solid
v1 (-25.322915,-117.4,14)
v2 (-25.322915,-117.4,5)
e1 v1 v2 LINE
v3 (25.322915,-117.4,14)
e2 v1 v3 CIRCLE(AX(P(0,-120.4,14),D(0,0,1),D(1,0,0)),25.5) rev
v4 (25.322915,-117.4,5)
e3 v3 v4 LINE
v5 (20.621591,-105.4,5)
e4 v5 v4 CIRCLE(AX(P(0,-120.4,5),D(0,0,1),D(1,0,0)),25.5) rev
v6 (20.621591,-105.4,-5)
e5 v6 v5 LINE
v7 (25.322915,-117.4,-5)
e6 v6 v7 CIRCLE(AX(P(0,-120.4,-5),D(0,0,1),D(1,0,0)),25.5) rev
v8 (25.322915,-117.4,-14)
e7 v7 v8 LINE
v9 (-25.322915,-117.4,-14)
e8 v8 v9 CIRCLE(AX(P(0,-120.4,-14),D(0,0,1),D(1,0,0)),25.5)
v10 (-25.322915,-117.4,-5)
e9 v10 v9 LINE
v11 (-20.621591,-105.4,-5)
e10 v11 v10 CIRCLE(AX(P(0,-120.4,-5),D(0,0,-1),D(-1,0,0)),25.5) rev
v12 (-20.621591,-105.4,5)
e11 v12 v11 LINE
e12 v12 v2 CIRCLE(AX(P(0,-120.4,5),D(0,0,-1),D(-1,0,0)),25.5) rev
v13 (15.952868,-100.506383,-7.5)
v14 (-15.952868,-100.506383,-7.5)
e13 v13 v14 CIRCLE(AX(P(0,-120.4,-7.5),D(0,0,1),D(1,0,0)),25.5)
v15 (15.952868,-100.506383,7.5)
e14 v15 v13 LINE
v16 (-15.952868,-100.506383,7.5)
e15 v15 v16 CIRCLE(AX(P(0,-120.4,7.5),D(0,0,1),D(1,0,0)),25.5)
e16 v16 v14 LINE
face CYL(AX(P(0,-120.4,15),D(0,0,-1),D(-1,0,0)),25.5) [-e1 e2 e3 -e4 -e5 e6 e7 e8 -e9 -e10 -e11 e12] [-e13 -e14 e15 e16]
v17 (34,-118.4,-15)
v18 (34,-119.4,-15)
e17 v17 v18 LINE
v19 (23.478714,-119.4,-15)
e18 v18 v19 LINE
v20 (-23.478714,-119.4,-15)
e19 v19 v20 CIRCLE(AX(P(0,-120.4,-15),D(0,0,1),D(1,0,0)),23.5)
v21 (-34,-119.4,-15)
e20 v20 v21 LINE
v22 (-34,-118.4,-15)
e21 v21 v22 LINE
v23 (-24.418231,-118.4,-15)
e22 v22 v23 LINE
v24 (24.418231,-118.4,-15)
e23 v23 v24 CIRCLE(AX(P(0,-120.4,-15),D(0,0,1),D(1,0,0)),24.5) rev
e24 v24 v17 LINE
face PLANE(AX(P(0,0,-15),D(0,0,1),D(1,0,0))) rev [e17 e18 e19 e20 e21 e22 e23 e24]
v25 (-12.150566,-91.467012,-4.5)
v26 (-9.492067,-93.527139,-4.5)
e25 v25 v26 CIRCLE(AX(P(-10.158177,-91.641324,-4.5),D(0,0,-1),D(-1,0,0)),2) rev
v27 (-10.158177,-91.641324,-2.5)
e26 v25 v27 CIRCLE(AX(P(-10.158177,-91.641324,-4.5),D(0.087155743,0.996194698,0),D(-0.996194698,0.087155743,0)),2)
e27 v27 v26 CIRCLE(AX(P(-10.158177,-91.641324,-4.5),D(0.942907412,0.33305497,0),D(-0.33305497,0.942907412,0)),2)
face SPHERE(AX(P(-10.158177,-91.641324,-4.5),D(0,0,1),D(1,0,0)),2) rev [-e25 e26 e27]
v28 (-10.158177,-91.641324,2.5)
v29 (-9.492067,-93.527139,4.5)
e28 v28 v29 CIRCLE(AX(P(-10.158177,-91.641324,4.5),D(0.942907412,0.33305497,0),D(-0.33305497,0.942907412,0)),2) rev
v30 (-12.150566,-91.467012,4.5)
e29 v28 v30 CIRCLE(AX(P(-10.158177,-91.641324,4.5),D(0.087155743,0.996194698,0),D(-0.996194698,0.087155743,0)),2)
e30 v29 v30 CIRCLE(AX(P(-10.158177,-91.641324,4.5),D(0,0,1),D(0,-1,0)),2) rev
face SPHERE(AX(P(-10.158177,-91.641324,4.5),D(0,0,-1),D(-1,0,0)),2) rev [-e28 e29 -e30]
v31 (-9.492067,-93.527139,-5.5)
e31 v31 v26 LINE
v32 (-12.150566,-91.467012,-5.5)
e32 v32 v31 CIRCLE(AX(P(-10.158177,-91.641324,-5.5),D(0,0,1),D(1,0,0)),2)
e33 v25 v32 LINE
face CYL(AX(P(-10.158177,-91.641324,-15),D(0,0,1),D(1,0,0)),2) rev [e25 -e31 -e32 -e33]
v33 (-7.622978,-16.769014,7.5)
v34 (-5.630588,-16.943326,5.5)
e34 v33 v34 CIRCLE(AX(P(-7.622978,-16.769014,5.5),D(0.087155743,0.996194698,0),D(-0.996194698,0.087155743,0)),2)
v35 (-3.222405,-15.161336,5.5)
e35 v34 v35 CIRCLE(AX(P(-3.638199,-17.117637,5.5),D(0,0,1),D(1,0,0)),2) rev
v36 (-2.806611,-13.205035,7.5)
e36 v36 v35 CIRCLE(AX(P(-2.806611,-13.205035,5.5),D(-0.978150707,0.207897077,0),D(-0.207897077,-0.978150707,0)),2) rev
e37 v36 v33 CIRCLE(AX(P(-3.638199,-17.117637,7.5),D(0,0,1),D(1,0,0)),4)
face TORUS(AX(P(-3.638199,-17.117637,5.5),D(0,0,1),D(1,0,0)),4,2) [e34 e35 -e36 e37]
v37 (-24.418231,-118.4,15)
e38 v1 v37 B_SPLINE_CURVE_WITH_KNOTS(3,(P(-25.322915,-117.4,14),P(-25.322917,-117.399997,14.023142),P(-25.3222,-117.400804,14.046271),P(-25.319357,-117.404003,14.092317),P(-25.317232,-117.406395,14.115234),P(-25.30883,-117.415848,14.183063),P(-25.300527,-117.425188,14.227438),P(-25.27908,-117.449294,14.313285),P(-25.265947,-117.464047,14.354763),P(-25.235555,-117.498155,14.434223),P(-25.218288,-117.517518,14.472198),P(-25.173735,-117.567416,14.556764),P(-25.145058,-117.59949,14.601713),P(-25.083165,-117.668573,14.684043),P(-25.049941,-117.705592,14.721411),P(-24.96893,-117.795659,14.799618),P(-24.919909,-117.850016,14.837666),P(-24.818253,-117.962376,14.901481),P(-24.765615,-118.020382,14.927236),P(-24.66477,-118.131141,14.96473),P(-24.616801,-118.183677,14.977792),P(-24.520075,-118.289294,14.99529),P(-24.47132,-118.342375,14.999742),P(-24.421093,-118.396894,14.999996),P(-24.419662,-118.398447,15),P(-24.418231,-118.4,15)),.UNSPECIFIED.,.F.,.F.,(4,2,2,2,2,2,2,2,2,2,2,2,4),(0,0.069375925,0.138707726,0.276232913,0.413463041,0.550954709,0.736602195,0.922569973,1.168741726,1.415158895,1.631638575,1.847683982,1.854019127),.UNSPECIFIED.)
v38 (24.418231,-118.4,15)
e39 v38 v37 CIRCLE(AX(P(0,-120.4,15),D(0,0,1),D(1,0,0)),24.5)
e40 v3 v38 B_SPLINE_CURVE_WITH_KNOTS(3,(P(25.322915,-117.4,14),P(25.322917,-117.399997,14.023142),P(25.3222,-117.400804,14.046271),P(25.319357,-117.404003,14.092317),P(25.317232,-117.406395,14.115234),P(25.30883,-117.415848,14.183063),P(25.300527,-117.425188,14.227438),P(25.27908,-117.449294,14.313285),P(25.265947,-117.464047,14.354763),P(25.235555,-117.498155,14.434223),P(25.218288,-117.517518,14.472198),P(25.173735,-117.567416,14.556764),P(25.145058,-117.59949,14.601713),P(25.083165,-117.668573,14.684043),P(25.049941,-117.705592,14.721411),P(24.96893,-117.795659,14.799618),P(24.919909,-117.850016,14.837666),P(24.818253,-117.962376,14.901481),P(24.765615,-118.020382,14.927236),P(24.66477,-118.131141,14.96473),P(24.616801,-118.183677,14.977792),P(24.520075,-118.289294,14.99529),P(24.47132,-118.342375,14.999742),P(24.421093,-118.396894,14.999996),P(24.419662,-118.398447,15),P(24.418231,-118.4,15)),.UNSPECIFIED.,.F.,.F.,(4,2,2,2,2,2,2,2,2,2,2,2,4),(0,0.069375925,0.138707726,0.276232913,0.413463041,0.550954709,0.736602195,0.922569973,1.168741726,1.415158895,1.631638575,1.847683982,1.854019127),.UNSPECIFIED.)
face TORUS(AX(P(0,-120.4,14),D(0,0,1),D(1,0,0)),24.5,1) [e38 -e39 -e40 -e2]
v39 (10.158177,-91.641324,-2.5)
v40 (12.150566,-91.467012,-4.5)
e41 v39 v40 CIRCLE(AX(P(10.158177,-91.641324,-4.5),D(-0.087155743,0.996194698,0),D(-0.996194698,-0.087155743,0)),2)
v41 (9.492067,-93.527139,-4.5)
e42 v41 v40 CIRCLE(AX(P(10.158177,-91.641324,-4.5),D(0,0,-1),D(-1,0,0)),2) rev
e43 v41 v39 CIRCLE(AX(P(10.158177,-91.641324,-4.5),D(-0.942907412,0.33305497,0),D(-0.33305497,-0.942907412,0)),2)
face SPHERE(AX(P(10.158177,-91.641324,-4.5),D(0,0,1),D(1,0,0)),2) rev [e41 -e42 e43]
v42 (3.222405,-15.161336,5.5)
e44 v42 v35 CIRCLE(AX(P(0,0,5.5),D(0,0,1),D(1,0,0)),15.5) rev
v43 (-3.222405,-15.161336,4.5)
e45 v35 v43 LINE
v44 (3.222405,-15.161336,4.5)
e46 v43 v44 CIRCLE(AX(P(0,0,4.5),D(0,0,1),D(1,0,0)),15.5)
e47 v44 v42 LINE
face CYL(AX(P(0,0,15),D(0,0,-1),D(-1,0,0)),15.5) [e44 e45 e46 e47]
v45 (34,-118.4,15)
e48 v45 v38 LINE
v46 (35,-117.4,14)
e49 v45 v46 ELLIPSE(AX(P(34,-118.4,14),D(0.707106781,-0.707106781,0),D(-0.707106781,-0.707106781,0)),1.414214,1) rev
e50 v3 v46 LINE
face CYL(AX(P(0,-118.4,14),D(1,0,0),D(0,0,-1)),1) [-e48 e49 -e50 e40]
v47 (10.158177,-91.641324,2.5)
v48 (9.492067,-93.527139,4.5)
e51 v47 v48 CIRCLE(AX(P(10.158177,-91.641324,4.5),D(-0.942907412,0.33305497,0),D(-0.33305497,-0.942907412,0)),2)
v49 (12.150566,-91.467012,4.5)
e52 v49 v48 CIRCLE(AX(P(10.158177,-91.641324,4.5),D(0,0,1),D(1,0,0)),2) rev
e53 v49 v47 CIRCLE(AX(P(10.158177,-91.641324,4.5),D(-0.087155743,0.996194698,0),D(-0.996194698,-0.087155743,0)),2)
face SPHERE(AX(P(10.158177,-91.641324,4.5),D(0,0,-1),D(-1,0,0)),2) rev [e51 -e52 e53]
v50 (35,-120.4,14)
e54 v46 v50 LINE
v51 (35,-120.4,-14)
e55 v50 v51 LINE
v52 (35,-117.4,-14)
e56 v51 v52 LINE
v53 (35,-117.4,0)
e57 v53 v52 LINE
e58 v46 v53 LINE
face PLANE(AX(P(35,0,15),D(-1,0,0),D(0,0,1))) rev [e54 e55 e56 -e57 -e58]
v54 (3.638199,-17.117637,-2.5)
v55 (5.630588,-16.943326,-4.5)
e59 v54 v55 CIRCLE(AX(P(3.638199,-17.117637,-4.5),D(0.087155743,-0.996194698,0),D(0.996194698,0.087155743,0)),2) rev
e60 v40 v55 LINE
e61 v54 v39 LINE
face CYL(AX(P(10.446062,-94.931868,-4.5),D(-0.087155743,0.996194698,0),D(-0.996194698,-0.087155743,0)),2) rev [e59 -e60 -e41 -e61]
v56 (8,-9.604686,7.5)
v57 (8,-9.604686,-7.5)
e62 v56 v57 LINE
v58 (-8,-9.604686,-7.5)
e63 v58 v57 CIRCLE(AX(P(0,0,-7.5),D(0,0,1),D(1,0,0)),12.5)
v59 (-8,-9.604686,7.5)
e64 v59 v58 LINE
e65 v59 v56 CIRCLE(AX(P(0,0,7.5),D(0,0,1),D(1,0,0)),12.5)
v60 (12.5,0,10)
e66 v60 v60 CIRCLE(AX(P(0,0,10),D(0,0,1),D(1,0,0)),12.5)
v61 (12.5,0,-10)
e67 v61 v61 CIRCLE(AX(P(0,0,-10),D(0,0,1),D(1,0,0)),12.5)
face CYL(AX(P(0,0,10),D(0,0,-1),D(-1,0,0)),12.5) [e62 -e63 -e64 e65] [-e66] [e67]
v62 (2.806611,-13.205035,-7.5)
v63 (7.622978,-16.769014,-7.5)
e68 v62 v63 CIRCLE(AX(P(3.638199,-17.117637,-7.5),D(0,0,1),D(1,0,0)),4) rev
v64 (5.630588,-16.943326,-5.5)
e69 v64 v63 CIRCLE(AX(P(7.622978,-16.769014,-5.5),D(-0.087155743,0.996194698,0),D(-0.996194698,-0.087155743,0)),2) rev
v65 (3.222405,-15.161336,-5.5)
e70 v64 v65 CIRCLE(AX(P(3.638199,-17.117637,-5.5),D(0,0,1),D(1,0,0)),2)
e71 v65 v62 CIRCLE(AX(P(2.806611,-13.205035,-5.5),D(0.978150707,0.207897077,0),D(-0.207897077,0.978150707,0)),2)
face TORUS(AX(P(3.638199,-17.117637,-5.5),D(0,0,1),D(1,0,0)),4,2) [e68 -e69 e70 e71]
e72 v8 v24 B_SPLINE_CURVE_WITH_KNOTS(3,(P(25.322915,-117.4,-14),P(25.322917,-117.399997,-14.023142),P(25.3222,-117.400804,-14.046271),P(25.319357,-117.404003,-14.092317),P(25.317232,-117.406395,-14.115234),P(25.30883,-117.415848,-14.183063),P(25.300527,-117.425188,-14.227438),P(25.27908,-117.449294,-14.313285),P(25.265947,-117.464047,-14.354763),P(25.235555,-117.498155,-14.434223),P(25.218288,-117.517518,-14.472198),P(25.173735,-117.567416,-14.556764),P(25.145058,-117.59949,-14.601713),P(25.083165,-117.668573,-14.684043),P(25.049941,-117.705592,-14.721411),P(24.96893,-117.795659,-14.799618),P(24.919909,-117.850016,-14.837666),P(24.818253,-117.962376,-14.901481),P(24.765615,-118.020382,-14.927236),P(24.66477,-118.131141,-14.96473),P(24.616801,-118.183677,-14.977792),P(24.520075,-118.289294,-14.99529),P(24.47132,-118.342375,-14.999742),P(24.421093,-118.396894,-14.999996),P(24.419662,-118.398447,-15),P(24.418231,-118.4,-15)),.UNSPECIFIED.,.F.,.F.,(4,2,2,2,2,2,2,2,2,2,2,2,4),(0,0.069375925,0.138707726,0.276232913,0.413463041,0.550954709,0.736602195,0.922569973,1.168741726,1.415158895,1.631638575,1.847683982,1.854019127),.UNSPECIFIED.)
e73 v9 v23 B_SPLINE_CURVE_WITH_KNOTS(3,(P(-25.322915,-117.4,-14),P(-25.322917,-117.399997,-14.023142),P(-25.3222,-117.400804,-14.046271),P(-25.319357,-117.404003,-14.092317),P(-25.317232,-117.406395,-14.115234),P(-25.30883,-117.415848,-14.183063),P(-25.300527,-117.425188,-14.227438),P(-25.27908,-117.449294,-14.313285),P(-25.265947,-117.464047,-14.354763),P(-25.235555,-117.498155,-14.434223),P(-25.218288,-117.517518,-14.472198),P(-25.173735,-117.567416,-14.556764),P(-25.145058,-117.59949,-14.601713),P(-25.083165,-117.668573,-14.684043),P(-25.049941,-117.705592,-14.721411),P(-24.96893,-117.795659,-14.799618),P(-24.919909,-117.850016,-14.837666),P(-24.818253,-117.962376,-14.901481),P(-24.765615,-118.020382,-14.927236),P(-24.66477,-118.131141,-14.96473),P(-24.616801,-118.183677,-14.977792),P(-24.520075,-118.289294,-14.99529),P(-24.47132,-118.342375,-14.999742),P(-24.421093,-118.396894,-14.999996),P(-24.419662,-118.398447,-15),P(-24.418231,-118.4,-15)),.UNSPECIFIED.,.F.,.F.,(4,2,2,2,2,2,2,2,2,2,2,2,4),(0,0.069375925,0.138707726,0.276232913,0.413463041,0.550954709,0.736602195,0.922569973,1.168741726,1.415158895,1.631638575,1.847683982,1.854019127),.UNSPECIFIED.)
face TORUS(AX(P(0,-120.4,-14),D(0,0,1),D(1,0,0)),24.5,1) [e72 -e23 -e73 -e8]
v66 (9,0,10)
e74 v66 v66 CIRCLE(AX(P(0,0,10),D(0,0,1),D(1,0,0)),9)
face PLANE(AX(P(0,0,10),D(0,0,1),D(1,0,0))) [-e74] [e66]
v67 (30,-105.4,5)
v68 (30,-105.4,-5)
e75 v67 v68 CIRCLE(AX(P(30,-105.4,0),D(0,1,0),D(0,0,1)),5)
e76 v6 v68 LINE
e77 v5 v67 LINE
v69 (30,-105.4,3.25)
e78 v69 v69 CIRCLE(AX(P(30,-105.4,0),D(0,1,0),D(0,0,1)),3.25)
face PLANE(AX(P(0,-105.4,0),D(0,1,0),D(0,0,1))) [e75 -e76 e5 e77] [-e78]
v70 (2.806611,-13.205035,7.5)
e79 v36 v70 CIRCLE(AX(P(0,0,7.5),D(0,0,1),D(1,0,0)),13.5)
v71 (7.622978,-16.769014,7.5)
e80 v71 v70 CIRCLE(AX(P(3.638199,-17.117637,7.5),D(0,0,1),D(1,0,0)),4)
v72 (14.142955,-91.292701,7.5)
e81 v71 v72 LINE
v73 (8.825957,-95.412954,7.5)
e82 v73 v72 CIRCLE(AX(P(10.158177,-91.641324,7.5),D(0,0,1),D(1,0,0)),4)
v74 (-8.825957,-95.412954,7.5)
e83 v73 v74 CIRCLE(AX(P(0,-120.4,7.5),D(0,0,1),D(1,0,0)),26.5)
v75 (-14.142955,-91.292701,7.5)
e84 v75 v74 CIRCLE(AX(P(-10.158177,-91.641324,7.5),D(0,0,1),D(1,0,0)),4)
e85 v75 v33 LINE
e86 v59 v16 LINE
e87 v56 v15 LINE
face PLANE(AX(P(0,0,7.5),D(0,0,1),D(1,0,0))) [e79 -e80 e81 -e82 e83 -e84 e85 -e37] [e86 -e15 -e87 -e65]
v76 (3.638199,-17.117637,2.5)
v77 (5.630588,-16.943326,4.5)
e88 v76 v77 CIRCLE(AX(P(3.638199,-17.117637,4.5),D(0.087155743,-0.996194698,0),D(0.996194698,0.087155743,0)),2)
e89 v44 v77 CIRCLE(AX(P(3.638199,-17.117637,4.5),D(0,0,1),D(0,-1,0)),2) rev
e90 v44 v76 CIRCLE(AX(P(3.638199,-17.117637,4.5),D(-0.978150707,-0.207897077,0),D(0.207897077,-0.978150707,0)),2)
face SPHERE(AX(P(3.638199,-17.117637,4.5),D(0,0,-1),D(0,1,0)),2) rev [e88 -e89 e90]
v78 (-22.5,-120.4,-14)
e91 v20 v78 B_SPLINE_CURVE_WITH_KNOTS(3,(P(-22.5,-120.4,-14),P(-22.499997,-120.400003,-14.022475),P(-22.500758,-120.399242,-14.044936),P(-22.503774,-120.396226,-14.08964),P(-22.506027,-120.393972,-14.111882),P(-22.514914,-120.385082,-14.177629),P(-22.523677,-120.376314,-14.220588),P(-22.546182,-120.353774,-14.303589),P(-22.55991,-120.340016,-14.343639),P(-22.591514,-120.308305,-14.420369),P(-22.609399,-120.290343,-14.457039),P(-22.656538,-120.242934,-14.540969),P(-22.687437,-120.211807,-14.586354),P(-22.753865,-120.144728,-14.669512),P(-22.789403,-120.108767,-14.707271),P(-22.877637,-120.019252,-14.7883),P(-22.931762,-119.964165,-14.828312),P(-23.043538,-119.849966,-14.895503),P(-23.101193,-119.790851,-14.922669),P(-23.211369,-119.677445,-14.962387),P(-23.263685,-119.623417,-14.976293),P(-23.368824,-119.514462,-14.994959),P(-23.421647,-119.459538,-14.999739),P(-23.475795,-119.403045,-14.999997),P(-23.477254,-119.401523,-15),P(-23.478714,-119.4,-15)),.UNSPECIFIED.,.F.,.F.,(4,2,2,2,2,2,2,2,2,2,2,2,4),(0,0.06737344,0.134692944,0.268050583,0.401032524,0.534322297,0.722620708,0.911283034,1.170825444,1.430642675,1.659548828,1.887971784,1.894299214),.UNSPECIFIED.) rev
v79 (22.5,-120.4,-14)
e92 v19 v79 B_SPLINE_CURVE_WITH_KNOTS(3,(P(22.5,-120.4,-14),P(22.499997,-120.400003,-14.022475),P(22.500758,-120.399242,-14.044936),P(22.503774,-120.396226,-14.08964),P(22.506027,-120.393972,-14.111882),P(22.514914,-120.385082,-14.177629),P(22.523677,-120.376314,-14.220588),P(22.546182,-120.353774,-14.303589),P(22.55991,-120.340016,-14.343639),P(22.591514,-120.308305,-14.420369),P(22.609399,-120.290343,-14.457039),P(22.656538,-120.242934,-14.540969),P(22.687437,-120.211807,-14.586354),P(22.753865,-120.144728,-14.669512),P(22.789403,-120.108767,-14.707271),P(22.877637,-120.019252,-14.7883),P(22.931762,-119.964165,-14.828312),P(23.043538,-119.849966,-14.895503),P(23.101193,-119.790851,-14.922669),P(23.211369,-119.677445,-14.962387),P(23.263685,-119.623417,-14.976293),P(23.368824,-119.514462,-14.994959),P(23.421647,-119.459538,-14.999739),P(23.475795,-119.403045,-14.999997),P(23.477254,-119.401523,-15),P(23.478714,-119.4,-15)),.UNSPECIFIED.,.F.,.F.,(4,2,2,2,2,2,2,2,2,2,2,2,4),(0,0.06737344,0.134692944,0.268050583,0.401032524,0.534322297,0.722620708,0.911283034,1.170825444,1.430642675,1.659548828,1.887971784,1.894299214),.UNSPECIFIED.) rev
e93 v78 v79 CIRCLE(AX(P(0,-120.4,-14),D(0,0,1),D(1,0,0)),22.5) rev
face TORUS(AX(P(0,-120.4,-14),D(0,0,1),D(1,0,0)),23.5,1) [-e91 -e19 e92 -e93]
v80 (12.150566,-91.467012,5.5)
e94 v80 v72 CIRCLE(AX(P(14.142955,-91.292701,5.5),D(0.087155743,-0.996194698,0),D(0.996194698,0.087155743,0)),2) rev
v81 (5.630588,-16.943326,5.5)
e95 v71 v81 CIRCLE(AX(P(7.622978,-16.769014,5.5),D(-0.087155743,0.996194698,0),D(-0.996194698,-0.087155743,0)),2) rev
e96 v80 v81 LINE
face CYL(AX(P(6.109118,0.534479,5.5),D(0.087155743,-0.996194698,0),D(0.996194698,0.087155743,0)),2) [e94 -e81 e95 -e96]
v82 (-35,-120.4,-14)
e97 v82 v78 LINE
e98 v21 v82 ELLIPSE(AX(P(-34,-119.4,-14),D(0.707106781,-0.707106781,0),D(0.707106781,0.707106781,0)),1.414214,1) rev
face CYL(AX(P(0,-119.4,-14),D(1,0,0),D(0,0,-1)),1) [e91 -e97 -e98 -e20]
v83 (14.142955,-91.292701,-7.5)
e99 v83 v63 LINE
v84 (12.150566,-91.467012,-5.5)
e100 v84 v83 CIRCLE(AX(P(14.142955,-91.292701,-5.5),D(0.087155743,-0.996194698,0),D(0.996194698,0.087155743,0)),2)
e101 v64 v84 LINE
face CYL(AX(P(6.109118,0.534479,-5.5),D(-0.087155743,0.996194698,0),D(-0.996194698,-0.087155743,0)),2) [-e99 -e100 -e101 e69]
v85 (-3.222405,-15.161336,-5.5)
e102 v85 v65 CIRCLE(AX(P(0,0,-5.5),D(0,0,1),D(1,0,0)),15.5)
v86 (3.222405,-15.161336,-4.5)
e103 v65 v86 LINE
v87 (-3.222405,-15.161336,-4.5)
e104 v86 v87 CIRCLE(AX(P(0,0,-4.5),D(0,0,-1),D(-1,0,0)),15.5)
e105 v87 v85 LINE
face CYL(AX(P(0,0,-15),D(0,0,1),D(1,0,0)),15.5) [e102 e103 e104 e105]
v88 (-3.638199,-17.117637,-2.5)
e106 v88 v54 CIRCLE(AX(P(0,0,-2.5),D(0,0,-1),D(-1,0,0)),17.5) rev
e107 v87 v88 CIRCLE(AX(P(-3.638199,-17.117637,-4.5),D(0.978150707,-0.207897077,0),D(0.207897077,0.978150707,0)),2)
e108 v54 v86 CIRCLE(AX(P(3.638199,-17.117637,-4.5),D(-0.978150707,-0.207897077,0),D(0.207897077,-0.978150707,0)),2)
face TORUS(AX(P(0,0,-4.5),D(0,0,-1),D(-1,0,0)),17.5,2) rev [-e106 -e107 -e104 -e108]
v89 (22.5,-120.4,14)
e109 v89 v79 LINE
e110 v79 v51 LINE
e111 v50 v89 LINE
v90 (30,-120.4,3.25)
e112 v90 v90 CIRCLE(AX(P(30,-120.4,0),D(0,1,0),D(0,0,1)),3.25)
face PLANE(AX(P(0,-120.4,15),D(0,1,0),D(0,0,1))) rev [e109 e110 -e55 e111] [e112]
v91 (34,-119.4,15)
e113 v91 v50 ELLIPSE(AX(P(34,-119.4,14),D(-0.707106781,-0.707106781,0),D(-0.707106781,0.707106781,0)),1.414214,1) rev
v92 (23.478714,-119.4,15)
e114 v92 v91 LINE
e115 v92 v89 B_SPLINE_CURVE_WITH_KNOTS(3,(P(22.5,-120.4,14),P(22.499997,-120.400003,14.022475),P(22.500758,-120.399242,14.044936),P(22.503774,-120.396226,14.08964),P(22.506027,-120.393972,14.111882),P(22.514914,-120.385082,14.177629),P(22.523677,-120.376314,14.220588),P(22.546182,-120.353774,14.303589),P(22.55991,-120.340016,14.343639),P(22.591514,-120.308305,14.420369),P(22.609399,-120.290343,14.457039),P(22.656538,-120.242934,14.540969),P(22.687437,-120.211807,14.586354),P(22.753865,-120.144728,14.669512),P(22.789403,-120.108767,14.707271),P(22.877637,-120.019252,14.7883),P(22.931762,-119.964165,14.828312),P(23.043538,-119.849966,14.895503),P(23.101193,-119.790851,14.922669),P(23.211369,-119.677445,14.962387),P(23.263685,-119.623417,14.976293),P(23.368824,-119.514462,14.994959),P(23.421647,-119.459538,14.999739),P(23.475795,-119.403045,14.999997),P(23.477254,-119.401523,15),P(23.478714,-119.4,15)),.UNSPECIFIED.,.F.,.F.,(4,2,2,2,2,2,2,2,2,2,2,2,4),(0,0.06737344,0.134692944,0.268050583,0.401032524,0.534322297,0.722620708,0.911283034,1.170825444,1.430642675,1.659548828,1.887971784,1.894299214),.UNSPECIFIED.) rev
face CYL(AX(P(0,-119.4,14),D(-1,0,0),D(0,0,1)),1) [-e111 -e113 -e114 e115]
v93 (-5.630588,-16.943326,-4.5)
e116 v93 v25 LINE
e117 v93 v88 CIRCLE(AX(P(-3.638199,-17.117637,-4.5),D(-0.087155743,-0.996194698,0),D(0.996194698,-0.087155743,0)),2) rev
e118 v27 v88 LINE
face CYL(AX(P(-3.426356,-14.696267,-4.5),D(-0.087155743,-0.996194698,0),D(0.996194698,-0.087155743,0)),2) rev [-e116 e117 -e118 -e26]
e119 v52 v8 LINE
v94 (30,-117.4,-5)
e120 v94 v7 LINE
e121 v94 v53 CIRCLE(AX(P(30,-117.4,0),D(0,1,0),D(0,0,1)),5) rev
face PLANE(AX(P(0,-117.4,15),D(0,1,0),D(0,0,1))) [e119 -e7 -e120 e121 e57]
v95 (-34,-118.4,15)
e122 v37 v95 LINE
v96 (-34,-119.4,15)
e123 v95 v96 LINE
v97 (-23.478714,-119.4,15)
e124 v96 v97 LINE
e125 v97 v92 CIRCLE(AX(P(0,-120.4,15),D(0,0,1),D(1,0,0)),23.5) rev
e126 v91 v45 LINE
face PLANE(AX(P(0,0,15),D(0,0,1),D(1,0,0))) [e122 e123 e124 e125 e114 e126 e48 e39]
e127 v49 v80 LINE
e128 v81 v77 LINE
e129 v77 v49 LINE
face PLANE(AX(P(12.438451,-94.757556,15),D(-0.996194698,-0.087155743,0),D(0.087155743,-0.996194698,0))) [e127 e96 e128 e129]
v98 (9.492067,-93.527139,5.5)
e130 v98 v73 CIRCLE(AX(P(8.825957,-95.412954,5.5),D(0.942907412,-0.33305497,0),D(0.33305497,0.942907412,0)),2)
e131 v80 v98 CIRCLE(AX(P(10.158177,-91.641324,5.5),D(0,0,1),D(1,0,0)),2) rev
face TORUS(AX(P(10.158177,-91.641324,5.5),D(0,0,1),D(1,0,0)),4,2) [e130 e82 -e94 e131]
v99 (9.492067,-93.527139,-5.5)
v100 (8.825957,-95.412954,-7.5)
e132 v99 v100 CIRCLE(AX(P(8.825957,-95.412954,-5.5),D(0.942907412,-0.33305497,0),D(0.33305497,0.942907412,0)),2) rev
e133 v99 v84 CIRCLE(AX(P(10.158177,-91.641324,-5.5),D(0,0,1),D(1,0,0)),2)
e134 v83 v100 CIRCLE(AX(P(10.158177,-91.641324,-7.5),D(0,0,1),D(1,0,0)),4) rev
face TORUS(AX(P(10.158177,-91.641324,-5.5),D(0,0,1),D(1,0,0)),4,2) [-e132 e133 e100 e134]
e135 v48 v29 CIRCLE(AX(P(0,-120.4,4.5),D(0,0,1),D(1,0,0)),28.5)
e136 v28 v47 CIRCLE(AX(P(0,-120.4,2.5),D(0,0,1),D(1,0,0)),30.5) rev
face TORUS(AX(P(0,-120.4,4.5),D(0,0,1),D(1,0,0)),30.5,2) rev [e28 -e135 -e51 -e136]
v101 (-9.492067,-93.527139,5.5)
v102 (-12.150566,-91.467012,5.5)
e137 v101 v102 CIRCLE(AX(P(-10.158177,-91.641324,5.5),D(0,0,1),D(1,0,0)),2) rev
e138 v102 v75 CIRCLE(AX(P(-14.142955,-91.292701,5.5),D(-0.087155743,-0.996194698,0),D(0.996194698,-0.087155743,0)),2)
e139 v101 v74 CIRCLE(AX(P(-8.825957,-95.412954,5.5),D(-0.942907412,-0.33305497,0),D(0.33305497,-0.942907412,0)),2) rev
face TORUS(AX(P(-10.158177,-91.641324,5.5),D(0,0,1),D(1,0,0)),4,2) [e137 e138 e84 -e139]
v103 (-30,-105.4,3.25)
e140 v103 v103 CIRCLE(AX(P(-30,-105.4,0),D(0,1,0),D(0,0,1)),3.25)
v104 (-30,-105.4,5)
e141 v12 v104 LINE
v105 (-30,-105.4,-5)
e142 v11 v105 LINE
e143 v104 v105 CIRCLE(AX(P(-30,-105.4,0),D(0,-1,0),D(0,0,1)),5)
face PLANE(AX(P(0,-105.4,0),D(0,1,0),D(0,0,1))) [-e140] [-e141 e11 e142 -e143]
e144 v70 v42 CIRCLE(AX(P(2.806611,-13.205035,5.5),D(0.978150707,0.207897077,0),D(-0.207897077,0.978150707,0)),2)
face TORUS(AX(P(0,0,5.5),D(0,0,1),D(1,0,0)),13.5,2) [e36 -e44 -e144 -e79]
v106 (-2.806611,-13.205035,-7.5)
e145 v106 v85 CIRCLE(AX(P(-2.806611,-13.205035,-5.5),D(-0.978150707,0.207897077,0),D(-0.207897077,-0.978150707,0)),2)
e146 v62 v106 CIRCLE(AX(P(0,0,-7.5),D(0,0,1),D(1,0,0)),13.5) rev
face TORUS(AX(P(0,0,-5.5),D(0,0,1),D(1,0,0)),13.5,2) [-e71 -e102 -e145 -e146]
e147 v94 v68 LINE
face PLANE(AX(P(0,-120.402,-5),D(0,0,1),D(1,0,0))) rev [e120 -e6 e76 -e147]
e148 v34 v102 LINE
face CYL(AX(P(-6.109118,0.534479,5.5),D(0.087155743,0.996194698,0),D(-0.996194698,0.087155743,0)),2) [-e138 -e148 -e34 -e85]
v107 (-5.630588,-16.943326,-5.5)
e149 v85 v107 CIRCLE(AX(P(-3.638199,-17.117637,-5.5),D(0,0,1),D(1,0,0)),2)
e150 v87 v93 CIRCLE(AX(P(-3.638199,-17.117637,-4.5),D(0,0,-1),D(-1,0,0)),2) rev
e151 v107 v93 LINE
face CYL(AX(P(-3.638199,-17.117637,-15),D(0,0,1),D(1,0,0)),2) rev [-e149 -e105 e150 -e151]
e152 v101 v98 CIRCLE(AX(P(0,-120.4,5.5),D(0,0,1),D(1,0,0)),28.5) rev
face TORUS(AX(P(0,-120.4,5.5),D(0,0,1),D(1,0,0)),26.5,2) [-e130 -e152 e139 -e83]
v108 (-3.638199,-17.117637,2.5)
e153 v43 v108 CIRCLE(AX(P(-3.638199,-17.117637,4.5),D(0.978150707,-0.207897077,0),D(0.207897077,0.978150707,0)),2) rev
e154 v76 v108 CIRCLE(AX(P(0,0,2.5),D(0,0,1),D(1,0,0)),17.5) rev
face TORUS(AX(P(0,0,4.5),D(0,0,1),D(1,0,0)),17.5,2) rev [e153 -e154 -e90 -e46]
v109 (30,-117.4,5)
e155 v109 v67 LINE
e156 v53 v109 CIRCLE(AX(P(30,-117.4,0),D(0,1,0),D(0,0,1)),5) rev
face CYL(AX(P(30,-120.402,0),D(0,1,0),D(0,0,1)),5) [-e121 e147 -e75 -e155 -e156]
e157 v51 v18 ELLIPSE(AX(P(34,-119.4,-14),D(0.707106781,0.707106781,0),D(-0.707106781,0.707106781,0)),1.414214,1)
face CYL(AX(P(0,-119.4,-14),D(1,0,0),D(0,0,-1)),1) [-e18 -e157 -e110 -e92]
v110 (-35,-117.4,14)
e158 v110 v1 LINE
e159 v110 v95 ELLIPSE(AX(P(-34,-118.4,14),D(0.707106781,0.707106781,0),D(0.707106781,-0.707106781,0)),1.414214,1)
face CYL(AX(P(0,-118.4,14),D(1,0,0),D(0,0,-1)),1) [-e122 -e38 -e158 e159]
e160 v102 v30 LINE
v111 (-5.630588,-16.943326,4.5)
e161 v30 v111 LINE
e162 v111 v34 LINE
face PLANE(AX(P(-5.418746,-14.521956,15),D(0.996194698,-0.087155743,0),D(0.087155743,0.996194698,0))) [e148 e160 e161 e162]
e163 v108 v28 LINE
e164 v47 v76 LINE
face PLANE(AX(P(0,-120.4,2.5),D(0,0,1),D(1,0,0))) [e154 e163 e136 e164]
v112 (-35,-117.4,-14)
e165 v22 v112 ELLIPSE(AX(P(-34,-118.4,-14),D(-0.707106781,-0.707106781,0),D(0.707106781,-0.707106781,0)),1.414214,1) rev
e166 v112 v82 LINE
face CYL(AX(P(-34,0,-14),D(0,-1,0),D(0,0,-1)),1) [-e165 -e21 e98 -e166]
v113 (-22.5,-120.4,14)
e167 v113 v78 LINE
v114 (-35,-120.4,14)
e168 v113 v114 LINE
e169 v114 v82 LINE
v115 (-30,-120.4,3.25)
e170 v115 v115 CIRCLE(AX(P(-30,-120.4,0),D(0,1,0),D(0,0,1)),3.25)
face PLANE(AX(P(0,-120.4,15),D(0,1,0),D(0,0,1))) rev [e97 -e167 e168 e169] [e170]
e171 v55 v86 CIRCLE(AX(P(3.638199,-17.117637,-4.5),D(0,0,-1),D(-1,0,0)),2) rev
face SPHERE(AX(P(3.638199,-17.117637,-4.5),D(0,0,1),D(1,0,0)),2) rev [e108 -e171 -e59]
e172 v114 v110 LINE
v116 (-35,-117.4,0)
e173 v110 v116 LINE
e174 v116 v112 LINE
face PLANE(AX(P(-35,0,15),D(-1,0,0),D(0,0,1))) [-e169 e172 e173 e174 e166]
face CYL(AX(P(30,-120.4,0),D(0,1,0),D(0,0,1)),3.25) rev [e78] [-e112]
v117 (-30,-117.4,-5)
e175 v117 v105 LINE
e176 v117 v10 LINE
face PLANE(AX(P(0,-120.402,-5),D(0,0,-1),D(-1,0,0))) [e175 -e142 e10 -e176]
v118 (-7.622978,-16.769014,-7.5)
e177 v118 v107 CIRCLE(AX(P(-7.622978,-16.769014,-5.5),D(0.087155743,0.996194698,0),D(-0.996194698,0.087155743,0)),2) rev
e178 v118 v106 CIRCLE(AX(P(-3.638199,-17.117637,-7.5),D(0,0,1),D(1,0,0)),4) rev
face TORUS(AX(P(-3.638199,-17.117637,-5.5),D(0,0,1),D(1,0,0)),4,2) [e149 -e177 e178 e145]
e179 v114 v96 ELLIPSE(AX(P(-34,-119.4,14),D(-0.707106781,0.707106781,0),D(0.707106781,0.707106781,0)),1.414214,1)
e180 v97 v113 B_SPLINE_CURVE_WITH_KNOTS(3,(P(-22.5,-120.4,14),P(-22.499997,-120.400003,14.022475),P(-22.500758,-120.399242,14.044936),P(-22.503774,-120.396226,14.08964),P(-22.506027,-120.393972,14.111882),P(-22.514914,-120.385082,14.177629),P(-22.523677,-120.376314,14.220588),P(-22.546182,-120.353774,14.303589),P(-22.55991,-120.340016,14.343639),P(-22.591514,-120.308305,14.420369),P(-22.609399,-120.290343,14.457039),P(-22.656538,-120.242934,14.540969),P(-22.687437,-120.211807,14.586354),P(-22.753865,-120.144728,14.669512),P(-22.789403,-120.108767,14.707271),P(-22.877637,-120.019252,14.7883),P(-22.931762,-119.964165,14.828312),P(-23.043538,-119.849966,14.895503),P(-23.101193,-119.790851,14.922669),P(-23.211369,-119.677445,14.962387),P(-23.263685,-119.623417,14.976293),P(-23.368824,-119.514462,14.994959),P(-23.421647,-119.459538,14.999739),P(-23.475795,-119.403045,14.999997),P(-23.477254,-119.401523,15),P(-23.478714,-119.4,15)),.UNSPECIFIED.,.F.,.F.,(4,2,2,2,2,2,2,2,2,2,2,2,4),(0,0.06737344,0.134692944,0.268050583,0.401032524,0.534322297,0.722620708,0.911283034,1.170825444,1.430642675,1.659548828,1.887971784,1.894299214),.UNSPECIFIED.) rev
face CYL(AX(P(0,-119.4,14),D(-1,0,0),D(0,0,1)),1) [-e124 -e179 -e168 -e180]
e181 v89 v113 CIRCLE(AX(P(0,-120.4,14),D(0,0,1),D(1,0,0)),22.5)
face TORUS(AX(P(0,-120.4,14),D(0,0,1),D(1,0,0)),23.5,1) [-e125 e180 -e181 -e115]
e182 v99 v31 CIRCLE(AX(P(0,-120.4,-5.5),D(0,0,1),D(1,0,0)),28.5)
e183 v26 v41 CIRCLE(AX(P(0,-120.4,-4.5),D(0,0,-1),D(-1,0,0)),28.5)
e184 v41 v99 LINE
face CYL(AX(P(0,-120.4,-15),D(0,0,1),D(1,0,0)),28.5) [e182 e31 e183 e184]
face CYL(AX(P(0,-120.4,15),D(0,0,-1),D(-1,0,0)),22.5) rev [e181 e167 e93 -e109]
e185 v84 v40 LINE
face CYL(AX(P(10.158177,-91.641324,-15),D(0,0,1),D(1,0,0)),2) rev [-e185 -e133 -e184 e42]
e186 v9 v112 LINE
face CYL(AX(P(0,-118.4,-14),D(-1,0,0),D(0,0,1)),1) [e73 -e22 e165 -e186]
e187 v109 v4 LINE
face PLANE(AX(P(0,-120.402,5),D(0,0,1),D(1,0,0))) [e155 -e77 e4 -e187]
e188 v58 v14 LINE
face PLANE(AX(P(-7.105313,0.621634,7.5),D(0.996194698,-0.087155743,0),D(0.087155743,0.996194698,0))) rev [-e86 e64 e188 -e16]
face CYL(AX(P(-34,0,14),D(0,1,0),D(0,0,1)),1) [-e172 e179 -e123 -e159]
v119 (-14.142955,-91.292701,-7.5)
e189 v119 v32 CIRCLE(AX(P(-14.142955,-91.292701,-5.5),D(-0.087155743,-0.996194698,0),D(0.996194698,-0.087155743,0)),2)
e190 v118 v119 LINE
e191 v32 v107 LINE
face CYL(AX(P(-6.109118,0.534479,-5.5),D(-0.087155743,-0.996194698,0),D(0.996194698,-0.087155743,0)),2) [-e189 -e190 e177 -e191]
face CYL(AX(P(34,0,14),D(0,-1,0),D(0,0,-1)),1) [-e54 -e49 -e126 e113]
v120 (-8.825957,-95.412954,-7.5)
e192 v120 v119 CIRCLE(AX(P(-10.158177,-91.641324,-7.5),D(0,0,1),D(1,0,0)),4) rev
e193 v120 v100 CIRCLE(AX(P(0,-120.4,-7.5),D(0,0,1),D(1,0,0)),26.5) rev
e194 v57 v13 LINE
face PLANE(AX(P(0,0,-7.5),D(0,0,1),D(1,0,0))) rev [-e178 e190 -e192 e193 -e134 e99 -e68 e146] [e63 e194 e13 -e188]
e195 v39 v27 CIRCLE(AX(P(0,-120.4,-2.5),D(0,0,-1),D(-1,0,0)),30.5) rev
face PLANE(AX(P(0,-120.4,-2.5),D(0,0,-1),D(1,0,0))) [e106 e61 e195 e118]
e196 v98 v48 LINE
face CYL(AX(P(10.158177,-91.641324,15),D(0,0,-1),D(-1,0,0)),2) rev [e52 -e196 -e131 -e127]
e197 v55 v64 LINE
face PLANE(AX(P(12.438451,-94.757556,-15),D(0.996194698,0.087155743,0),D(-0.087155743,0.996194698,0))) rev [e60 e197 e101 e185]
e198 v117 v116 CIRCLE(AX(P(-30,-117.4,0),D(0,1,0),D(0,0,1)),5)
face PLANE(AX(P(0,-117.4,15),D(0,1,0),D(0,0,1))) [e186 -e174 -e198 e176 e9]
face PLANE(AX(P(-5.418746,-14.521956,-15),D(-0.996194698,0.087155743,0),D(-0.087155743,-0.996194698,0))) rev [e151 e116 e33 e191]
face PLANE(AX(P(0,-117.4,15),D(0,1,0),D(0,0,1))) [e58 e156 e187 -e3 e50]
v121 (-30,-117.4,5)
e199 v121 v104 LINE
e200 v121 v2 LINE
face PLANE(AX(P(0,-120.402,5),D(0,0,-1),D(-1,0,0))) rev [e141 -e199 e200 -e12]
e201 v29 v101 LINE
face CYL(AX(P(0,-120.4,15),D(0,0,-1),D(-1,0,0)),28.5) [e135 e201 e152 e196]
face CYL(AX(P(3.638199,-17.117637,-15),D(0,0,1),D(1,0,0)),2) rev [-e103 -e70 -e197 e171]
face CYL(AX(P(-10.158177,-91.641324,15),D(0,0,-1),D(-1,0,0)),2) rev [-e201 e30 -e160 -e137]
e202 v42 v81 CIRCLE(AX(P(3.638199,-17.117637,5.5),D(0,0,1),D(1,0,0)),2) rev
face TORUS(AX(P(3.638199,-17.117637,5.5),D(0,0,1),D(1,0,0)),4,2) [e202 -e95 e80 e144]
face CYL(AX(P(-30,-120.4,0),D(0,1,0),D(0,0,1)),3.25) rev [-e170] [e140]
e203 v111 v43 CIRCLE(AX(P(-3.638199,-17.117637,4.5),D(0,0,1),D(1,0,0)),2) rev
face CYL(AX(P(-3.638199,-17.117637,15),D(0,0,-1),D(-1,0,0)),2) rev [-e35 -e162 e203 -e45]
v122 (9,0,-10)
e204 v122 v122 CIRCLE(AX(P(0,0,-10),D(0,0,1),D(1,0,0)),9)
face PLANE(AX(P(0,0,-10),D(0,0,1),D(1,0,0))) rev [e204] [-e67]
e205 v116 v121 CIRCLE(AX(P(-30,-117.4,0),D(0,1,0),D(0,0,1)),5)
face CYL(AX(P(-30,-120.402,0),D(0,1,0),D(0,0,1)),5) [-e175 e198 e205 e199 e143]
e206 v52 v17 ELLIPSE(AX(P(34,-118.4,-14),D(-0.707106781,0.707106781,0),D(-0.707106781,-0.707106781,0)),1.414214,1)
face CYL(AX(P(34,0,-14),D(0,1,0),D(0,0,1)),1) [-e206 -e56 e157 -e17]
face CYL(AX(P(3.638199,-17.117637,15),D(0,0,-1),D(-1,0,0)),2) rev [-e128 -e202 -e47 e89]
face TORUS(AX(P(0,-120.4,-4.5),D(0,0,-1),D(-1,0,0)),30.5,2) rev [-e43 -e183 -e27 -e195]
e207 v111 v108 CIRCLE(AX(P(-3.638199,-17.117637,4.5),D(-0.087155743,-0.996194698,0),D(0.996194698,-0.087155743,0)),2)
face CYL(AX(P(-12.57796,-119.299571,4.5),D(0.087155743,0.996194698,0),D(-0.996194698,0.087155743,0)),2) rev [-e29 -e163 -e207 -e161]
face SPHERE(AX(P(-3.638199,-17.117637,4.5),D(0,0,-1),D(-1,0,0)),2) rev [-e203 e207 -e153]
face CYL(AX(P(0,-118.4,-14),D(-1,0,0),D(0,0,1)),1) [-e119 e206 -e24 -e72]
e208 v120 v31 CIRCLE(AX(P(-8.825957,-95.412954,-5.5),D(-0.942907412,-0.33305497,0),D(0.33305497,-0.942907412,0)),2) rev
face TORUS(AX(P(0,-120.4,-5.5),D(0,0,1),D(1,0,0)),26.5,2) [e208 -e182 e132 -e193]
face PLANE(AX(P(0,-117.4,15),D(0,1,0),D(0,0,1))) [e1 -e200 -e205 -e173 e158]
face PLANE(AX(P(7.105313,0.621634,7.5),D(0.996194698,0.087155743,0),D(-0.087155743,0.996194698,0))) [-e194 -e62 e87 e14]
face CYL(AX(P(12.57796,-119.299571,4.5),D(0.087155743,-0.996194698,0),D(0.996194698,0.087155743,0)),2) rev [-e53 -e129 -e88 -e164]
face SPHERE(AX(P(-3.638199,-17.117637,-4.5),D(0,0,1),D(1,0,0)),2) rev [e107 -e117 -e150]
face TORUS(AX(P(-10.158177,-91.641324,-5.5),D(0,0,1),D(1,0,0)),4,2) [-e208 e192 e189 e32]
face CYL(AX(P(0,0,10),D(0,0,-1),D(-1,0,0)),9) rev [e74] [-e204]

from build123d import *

# Parameters (mm, degrees)
SKETCH1_R           = 12.5
SKETCH1_R_2         = 9
BOSS_EXTRUDE1_DEPTH = 10
BOSS_EXTRUDE2_DEPTH = 15
BOSS_EXTRUDE3_DEPTH = 7.5
CUT_EXTRUDE1_START  = 2.5
CUT_EXTRUDE1_DEPTH  = 132.27810578243563
CUT_EXTRUDE2_START  = 12
CUT_EXTRUDE2_DEPTH  = 148.36620704592414
FILLET1_R           = 2
FILLET2_R           = 1


with BuildPart() as part:
    # Sketch1 → Boss-Extrude1 (new, symmetric)
    with BuildSketch(Plane.XY):
        Circle(SKETCH1_R)
        Circle(SKETCH1_R_2, mode=Mode.SUBTRACT)
    extrude(amount=BOSS_EXTRUDE1_DEPTH, both=True)



with BuildPart() as body_2:
    # Sketch1<4> → Boss-Extrude2 (new, symmetric)
    with BuildSketch(Plane.XY):
        with BuildLine():
            ThreePointArc((15.952867935585882, -100.50638281684911), (8.454666221372882, -96.342389580734), (-3.4017e-13, -94.9))
            Line((1.162e-14, -94.9), (1.199e-14, -97.9))
            ThreePointArc((3.6442e-13, -97.9), (15.909902576697455, -104.49009742330281), (22.500000000000014, -120.4))
            Line((22.500000000000018, -120.4), (35, -120.4))
            Line((35, -120.4), (35, -117.4))
            Line((35, -117.4), (25.322914524201217, -117.4))
            ThreePointArc((25.322914524201213, -117.4), (22.29957689732318, -108.03153727416496), (15.952867935585882, -100.50638281684911))
        make_face()
        with BuildLine():
            Line((1.199e-14, -97.9), (1.162e-14, -94.9))
            ThreePointArc((-3.4017e-13, -94.9), (-8.454666221373191, -96.3423895807341), (-15.95286793558586, -100.50638281684913))
            ThreePointArc((-15.95286793558586, -100.50638281684913), (-22.299576897323156, -108.03153727416496), (-25.32291452420118, -117.4))
            Line((-25.322914524201188, -117.4), (-35, -117.4))
            Line((-35, -117.4), (-35, -120.4))
            Line((-35, -120.4), (-22.49999999999999, -120.4))
            ThreePointArc((-22.499999999999986, -120.4), (-15.909902576697178, -104.49009742330256), (3.6442e-13, -97.9))
        make_face()
    extrude(amount=BOSS_EXTRUDE2_DEPTH, both=True)


with BuildPart() as part_1:
    add(part.part)

    add(body_2.part)  # Boss-Extrude3 merges body 2
    # Sketch1<5> → Boss-Extrude3 (add, symmetric)
    with BuildSketch(Plane.XY):
        with BuildLine():
            Line((1.162e-14, -94.9), (1.53e-15, -12.5))
            ThreePointArc((-3.5757e-13, -12.5), (-4.253905296791234, -11.753905296790998), (-7.999999999999999, -9.604686356149275))
            Line((-7.999999999999998, -9.604686356149276), (-15.95286793558585, -100.50638281684913))
            ThreePointArc((-15.95286793558586, -100.50638281684913), (-8.454666221373191, -96.3423895807341), (-3.4017e-13, -94.9))
        make_face()
        with BuildLine():
            ThreePointArc((7.9999999999999964, -9.604686356149276), (4.2539052967908955, -11.753905296791121), (-3.5757e-13, -12.5))
            Line((1.53e-15, -12.5), (1.162e-14, -94.9))
            ThreePointArc((-3.4017e-13, -94.9), (8.454666221372882, -96.342389580734), (15.952867935585882, -100.50638281684911))
            Line((15.952867935585878, -100.50638281684913), (8.000000000000002, -9.604686356149275))
        make_face()
    extrude(amount=BOSS_EXTRUDE3_DEPTH, both=True)

    # Sketch2 → Cut-Extrude1 (cut)
    with BuildSketch(Plane.XY.offset(CUT_EXTRUDE1_START)):
        with BuildLine():
            Line((12.438451254570163, -94.75755607615214), (5.418745800218238, -14.521955582930875))
            ThreePointArc((5.418745800218238, -14.521955582930875), (9.5e-16, -15.499999999999998), (-5.418745800218232, -14.521955582930875))
            Line((-5.418745800218232, -14.521955582930875), (-12.438451254570134, -94.75755607615213))
            ThreePointArc((-12.438451254570134, -94.75755607615213), (1.649e-14, -91.9), (12.438451254570163, -94.75755607615214))
        make_face()
    cut_extrude1 = extrude(amount=CUT_EXTRUDE1_DEPTH, mode=Mode.SUBTRACT)

    # Mirror1: Cut-Extrude1 across plane
    add(cut_extrude1.mirror(Plane.XY), mode=Mode.SUBTRACT)

    # Boss-Extrude4: read off the stored shape, not the designer's step
    # Boss-Extrude4: loft between two sections, ruled curve by curve
    boss_extrude4_from = [
        Edge.make_three_point_arc((30, -117.4, 5), (33.535533906, -117.4, 3.535533906), (35, -117.4, 0)),
        Edge.make_three_point_arc((35, -117.4, 0), (33.535533906, -117.4, -3.535533906), (30, -117.4, -5)),
        Edge.make_line((30, -117.4, 5), (25.322914524, -117.4, 5)),
        Edge.make_line((30, -117.4, -5), (25.322914524, -117.4, -5)),
        Edge.make_line((25.322914524, -117.4, -5), (25.322914524, -117.4, 5)),
    ]
    boss_extrude4_to = [
        Edge.make_three_point_arc((30, -105.4, 5), (33.535533906, -105.4, 3.535533906), (35, -105.4, 0)),
        Edge.make_three_point_arc((35, -105.4, 0), (33.535533906, -105.4, -3.535533906), (30, -105.4, -5)),
        Edge.make_line((30, -105.4, 5), (20.621590627, -105.4, 5)),
        Edge.make_line((30, -105.4, -5), (20.621590627, -105.4, -5)),
        Edge.make_line((20.621590627, -105.4, -5), (20.621590627, -105.4, 5)),
    ]
    boss_extrude4 = Solid(Shell([*[Face.make_surface_from_curves(boss_extrude4_from[k], boss_extrude4_to[k]) for k in range(5)], Face(Wire(boss_extrude4_from)), Face(Wire(boss_extrude4_to))]))
    add(boss_extrude4)

    # Sketch3<3> → Cut-Extrude2 (cut, through all)
    with BuildSketch(Plane(origin=(0, -117.4, 0), x_dir=(1, 0, 0), z_dir=(0, 1, 0)).offset(CUT_EXTRUDE2_START)):
        with BuildLine():
            ThreePointArc((33.25, 0), (32.29809703885629, 2.2980970388562687), (30.00000000000003, 3.2499999999999973))
            Line((30.000000000000004, 3.2499999999999973), (30.000000000000004, -3.2499999999999973))
            ThreePointArc((30.000000000000032, -3.2499999999999973), (32.29809703885629, -2.298097038856268), (33.25, -8e-16))
        make_face()
        with BuildLine():
            Line((30.000000000000004, -3.2499999999999973), (30.000000000000004, 3.2499999999999973))
            ThreePointArc((30.00000000000003, 3.2499999999999973), (26.750000000000007, -2.49e-15), (30.000000000000032, -3.2499999999999973))
        make_face()
    cut_extrude2 = extrude(amount=-CUT_EXTRUDE2_DEPTH, mode=Mode.SUBTRACT)

    # Mirror2: Boss-Extrude4, Cut-Extrude2 across plane
    add(boss_extrude4.mirror(Plane(origin=(0, 0, 0), x_dir=(0, 0, 1), z_dir=(1, 0, 0))))
    add(cut_extrude2.mirror(Plane(origin=(0, 0, 0), x_dir=(0, 0, 1), z_dir=(1, 0, 0))), mode=Mode.SUBTRACT)

    # Fillet1
    fillet1_edges = [part_1.edges().sort_by_distance(p)[0] for p in [
        (-8.928598527394184, -54.6397558295415, 7.5),
        (2.2e-16, -15.499999999999998, 7.5),
        (8.9285985273942, -54.6397558295415, 7.5),
        (7.99e-15, -91.9, 7.5),
        (-12.438451254570136, -94.75755607615213, 5),
        (1.51e-14, -91.9, 2.5),
        (12.438451254570161, -94.75755607615213, 5),
        (8.9285985273942, -54.63975582954151, 2.5),
        (5.418745800218238, -14.521955582930875, 5),
        (2e-15, -15.499999999999998, 2.5),
        (-5.418745800218234, -14.521955582930875, 5),
        (-8.928598527394183, -54.6397558295415, 2.5),
        (8.9285985273942, -54.63975582954151, -7.5),
        (5.55e-15, -15.499999999999998, -7.5),
        (-8.928598527394184, -54.6397558295415, -7.5),
        (8.9e-16, -91.9, -7.5),
        (12.438451254570161, -94.75755607615213, -5),
        (-12.438451254570136, -94.75755607615213, -5),
        (-5.418745800218234, -14.521955582930875, -5),
        (5.418745800218238, -14.521955582930875, -5),
        (1.51e-14, -91.9, -2.5),
        (8.9285985273942, -54.63975582954151, -2.5),
        (2e-15, -15.499999999999998, -2.5),
        (-8.928598527394183, -54.6397558295415, -2.5),
    ]]
    fillet(fillet1_edges, radius=FILLET1_R)

    # Fillet2
    fillet2_edges = [part_1.edges().sort_by_distance(p)[0] for p in [
        (-3.952e-14, -94.90000000000005, -15),
        (-30.161457262100594, -117.4, 15),
        (-35, -118.9, 15),
        (-28.749999999999993, -120.4, -15),
        (5.82e-15, -97.9, 15),
        (28.750000000000007, -120.4, -15),
        (35, -118.9, -15),
        (30.16145726210061, -117.4, 15),
        (-5.063e-14, -94.89999999999996, 15),
        (-28.749999999999993, -120.4, 15),
        (28.750000000000007, -120.4, 15),
        (35, -118.9, 15),
        (30.16145726210061, -117.4, -15),
        (2.349e-14, -97.9, -15),
        (-35, -118.9, -15),
        (-30.161457262100594, -117.4, -15),
    ]]
    fillet(fillet2_edges, radius=FILLET2_R)


solid = part_1.part
